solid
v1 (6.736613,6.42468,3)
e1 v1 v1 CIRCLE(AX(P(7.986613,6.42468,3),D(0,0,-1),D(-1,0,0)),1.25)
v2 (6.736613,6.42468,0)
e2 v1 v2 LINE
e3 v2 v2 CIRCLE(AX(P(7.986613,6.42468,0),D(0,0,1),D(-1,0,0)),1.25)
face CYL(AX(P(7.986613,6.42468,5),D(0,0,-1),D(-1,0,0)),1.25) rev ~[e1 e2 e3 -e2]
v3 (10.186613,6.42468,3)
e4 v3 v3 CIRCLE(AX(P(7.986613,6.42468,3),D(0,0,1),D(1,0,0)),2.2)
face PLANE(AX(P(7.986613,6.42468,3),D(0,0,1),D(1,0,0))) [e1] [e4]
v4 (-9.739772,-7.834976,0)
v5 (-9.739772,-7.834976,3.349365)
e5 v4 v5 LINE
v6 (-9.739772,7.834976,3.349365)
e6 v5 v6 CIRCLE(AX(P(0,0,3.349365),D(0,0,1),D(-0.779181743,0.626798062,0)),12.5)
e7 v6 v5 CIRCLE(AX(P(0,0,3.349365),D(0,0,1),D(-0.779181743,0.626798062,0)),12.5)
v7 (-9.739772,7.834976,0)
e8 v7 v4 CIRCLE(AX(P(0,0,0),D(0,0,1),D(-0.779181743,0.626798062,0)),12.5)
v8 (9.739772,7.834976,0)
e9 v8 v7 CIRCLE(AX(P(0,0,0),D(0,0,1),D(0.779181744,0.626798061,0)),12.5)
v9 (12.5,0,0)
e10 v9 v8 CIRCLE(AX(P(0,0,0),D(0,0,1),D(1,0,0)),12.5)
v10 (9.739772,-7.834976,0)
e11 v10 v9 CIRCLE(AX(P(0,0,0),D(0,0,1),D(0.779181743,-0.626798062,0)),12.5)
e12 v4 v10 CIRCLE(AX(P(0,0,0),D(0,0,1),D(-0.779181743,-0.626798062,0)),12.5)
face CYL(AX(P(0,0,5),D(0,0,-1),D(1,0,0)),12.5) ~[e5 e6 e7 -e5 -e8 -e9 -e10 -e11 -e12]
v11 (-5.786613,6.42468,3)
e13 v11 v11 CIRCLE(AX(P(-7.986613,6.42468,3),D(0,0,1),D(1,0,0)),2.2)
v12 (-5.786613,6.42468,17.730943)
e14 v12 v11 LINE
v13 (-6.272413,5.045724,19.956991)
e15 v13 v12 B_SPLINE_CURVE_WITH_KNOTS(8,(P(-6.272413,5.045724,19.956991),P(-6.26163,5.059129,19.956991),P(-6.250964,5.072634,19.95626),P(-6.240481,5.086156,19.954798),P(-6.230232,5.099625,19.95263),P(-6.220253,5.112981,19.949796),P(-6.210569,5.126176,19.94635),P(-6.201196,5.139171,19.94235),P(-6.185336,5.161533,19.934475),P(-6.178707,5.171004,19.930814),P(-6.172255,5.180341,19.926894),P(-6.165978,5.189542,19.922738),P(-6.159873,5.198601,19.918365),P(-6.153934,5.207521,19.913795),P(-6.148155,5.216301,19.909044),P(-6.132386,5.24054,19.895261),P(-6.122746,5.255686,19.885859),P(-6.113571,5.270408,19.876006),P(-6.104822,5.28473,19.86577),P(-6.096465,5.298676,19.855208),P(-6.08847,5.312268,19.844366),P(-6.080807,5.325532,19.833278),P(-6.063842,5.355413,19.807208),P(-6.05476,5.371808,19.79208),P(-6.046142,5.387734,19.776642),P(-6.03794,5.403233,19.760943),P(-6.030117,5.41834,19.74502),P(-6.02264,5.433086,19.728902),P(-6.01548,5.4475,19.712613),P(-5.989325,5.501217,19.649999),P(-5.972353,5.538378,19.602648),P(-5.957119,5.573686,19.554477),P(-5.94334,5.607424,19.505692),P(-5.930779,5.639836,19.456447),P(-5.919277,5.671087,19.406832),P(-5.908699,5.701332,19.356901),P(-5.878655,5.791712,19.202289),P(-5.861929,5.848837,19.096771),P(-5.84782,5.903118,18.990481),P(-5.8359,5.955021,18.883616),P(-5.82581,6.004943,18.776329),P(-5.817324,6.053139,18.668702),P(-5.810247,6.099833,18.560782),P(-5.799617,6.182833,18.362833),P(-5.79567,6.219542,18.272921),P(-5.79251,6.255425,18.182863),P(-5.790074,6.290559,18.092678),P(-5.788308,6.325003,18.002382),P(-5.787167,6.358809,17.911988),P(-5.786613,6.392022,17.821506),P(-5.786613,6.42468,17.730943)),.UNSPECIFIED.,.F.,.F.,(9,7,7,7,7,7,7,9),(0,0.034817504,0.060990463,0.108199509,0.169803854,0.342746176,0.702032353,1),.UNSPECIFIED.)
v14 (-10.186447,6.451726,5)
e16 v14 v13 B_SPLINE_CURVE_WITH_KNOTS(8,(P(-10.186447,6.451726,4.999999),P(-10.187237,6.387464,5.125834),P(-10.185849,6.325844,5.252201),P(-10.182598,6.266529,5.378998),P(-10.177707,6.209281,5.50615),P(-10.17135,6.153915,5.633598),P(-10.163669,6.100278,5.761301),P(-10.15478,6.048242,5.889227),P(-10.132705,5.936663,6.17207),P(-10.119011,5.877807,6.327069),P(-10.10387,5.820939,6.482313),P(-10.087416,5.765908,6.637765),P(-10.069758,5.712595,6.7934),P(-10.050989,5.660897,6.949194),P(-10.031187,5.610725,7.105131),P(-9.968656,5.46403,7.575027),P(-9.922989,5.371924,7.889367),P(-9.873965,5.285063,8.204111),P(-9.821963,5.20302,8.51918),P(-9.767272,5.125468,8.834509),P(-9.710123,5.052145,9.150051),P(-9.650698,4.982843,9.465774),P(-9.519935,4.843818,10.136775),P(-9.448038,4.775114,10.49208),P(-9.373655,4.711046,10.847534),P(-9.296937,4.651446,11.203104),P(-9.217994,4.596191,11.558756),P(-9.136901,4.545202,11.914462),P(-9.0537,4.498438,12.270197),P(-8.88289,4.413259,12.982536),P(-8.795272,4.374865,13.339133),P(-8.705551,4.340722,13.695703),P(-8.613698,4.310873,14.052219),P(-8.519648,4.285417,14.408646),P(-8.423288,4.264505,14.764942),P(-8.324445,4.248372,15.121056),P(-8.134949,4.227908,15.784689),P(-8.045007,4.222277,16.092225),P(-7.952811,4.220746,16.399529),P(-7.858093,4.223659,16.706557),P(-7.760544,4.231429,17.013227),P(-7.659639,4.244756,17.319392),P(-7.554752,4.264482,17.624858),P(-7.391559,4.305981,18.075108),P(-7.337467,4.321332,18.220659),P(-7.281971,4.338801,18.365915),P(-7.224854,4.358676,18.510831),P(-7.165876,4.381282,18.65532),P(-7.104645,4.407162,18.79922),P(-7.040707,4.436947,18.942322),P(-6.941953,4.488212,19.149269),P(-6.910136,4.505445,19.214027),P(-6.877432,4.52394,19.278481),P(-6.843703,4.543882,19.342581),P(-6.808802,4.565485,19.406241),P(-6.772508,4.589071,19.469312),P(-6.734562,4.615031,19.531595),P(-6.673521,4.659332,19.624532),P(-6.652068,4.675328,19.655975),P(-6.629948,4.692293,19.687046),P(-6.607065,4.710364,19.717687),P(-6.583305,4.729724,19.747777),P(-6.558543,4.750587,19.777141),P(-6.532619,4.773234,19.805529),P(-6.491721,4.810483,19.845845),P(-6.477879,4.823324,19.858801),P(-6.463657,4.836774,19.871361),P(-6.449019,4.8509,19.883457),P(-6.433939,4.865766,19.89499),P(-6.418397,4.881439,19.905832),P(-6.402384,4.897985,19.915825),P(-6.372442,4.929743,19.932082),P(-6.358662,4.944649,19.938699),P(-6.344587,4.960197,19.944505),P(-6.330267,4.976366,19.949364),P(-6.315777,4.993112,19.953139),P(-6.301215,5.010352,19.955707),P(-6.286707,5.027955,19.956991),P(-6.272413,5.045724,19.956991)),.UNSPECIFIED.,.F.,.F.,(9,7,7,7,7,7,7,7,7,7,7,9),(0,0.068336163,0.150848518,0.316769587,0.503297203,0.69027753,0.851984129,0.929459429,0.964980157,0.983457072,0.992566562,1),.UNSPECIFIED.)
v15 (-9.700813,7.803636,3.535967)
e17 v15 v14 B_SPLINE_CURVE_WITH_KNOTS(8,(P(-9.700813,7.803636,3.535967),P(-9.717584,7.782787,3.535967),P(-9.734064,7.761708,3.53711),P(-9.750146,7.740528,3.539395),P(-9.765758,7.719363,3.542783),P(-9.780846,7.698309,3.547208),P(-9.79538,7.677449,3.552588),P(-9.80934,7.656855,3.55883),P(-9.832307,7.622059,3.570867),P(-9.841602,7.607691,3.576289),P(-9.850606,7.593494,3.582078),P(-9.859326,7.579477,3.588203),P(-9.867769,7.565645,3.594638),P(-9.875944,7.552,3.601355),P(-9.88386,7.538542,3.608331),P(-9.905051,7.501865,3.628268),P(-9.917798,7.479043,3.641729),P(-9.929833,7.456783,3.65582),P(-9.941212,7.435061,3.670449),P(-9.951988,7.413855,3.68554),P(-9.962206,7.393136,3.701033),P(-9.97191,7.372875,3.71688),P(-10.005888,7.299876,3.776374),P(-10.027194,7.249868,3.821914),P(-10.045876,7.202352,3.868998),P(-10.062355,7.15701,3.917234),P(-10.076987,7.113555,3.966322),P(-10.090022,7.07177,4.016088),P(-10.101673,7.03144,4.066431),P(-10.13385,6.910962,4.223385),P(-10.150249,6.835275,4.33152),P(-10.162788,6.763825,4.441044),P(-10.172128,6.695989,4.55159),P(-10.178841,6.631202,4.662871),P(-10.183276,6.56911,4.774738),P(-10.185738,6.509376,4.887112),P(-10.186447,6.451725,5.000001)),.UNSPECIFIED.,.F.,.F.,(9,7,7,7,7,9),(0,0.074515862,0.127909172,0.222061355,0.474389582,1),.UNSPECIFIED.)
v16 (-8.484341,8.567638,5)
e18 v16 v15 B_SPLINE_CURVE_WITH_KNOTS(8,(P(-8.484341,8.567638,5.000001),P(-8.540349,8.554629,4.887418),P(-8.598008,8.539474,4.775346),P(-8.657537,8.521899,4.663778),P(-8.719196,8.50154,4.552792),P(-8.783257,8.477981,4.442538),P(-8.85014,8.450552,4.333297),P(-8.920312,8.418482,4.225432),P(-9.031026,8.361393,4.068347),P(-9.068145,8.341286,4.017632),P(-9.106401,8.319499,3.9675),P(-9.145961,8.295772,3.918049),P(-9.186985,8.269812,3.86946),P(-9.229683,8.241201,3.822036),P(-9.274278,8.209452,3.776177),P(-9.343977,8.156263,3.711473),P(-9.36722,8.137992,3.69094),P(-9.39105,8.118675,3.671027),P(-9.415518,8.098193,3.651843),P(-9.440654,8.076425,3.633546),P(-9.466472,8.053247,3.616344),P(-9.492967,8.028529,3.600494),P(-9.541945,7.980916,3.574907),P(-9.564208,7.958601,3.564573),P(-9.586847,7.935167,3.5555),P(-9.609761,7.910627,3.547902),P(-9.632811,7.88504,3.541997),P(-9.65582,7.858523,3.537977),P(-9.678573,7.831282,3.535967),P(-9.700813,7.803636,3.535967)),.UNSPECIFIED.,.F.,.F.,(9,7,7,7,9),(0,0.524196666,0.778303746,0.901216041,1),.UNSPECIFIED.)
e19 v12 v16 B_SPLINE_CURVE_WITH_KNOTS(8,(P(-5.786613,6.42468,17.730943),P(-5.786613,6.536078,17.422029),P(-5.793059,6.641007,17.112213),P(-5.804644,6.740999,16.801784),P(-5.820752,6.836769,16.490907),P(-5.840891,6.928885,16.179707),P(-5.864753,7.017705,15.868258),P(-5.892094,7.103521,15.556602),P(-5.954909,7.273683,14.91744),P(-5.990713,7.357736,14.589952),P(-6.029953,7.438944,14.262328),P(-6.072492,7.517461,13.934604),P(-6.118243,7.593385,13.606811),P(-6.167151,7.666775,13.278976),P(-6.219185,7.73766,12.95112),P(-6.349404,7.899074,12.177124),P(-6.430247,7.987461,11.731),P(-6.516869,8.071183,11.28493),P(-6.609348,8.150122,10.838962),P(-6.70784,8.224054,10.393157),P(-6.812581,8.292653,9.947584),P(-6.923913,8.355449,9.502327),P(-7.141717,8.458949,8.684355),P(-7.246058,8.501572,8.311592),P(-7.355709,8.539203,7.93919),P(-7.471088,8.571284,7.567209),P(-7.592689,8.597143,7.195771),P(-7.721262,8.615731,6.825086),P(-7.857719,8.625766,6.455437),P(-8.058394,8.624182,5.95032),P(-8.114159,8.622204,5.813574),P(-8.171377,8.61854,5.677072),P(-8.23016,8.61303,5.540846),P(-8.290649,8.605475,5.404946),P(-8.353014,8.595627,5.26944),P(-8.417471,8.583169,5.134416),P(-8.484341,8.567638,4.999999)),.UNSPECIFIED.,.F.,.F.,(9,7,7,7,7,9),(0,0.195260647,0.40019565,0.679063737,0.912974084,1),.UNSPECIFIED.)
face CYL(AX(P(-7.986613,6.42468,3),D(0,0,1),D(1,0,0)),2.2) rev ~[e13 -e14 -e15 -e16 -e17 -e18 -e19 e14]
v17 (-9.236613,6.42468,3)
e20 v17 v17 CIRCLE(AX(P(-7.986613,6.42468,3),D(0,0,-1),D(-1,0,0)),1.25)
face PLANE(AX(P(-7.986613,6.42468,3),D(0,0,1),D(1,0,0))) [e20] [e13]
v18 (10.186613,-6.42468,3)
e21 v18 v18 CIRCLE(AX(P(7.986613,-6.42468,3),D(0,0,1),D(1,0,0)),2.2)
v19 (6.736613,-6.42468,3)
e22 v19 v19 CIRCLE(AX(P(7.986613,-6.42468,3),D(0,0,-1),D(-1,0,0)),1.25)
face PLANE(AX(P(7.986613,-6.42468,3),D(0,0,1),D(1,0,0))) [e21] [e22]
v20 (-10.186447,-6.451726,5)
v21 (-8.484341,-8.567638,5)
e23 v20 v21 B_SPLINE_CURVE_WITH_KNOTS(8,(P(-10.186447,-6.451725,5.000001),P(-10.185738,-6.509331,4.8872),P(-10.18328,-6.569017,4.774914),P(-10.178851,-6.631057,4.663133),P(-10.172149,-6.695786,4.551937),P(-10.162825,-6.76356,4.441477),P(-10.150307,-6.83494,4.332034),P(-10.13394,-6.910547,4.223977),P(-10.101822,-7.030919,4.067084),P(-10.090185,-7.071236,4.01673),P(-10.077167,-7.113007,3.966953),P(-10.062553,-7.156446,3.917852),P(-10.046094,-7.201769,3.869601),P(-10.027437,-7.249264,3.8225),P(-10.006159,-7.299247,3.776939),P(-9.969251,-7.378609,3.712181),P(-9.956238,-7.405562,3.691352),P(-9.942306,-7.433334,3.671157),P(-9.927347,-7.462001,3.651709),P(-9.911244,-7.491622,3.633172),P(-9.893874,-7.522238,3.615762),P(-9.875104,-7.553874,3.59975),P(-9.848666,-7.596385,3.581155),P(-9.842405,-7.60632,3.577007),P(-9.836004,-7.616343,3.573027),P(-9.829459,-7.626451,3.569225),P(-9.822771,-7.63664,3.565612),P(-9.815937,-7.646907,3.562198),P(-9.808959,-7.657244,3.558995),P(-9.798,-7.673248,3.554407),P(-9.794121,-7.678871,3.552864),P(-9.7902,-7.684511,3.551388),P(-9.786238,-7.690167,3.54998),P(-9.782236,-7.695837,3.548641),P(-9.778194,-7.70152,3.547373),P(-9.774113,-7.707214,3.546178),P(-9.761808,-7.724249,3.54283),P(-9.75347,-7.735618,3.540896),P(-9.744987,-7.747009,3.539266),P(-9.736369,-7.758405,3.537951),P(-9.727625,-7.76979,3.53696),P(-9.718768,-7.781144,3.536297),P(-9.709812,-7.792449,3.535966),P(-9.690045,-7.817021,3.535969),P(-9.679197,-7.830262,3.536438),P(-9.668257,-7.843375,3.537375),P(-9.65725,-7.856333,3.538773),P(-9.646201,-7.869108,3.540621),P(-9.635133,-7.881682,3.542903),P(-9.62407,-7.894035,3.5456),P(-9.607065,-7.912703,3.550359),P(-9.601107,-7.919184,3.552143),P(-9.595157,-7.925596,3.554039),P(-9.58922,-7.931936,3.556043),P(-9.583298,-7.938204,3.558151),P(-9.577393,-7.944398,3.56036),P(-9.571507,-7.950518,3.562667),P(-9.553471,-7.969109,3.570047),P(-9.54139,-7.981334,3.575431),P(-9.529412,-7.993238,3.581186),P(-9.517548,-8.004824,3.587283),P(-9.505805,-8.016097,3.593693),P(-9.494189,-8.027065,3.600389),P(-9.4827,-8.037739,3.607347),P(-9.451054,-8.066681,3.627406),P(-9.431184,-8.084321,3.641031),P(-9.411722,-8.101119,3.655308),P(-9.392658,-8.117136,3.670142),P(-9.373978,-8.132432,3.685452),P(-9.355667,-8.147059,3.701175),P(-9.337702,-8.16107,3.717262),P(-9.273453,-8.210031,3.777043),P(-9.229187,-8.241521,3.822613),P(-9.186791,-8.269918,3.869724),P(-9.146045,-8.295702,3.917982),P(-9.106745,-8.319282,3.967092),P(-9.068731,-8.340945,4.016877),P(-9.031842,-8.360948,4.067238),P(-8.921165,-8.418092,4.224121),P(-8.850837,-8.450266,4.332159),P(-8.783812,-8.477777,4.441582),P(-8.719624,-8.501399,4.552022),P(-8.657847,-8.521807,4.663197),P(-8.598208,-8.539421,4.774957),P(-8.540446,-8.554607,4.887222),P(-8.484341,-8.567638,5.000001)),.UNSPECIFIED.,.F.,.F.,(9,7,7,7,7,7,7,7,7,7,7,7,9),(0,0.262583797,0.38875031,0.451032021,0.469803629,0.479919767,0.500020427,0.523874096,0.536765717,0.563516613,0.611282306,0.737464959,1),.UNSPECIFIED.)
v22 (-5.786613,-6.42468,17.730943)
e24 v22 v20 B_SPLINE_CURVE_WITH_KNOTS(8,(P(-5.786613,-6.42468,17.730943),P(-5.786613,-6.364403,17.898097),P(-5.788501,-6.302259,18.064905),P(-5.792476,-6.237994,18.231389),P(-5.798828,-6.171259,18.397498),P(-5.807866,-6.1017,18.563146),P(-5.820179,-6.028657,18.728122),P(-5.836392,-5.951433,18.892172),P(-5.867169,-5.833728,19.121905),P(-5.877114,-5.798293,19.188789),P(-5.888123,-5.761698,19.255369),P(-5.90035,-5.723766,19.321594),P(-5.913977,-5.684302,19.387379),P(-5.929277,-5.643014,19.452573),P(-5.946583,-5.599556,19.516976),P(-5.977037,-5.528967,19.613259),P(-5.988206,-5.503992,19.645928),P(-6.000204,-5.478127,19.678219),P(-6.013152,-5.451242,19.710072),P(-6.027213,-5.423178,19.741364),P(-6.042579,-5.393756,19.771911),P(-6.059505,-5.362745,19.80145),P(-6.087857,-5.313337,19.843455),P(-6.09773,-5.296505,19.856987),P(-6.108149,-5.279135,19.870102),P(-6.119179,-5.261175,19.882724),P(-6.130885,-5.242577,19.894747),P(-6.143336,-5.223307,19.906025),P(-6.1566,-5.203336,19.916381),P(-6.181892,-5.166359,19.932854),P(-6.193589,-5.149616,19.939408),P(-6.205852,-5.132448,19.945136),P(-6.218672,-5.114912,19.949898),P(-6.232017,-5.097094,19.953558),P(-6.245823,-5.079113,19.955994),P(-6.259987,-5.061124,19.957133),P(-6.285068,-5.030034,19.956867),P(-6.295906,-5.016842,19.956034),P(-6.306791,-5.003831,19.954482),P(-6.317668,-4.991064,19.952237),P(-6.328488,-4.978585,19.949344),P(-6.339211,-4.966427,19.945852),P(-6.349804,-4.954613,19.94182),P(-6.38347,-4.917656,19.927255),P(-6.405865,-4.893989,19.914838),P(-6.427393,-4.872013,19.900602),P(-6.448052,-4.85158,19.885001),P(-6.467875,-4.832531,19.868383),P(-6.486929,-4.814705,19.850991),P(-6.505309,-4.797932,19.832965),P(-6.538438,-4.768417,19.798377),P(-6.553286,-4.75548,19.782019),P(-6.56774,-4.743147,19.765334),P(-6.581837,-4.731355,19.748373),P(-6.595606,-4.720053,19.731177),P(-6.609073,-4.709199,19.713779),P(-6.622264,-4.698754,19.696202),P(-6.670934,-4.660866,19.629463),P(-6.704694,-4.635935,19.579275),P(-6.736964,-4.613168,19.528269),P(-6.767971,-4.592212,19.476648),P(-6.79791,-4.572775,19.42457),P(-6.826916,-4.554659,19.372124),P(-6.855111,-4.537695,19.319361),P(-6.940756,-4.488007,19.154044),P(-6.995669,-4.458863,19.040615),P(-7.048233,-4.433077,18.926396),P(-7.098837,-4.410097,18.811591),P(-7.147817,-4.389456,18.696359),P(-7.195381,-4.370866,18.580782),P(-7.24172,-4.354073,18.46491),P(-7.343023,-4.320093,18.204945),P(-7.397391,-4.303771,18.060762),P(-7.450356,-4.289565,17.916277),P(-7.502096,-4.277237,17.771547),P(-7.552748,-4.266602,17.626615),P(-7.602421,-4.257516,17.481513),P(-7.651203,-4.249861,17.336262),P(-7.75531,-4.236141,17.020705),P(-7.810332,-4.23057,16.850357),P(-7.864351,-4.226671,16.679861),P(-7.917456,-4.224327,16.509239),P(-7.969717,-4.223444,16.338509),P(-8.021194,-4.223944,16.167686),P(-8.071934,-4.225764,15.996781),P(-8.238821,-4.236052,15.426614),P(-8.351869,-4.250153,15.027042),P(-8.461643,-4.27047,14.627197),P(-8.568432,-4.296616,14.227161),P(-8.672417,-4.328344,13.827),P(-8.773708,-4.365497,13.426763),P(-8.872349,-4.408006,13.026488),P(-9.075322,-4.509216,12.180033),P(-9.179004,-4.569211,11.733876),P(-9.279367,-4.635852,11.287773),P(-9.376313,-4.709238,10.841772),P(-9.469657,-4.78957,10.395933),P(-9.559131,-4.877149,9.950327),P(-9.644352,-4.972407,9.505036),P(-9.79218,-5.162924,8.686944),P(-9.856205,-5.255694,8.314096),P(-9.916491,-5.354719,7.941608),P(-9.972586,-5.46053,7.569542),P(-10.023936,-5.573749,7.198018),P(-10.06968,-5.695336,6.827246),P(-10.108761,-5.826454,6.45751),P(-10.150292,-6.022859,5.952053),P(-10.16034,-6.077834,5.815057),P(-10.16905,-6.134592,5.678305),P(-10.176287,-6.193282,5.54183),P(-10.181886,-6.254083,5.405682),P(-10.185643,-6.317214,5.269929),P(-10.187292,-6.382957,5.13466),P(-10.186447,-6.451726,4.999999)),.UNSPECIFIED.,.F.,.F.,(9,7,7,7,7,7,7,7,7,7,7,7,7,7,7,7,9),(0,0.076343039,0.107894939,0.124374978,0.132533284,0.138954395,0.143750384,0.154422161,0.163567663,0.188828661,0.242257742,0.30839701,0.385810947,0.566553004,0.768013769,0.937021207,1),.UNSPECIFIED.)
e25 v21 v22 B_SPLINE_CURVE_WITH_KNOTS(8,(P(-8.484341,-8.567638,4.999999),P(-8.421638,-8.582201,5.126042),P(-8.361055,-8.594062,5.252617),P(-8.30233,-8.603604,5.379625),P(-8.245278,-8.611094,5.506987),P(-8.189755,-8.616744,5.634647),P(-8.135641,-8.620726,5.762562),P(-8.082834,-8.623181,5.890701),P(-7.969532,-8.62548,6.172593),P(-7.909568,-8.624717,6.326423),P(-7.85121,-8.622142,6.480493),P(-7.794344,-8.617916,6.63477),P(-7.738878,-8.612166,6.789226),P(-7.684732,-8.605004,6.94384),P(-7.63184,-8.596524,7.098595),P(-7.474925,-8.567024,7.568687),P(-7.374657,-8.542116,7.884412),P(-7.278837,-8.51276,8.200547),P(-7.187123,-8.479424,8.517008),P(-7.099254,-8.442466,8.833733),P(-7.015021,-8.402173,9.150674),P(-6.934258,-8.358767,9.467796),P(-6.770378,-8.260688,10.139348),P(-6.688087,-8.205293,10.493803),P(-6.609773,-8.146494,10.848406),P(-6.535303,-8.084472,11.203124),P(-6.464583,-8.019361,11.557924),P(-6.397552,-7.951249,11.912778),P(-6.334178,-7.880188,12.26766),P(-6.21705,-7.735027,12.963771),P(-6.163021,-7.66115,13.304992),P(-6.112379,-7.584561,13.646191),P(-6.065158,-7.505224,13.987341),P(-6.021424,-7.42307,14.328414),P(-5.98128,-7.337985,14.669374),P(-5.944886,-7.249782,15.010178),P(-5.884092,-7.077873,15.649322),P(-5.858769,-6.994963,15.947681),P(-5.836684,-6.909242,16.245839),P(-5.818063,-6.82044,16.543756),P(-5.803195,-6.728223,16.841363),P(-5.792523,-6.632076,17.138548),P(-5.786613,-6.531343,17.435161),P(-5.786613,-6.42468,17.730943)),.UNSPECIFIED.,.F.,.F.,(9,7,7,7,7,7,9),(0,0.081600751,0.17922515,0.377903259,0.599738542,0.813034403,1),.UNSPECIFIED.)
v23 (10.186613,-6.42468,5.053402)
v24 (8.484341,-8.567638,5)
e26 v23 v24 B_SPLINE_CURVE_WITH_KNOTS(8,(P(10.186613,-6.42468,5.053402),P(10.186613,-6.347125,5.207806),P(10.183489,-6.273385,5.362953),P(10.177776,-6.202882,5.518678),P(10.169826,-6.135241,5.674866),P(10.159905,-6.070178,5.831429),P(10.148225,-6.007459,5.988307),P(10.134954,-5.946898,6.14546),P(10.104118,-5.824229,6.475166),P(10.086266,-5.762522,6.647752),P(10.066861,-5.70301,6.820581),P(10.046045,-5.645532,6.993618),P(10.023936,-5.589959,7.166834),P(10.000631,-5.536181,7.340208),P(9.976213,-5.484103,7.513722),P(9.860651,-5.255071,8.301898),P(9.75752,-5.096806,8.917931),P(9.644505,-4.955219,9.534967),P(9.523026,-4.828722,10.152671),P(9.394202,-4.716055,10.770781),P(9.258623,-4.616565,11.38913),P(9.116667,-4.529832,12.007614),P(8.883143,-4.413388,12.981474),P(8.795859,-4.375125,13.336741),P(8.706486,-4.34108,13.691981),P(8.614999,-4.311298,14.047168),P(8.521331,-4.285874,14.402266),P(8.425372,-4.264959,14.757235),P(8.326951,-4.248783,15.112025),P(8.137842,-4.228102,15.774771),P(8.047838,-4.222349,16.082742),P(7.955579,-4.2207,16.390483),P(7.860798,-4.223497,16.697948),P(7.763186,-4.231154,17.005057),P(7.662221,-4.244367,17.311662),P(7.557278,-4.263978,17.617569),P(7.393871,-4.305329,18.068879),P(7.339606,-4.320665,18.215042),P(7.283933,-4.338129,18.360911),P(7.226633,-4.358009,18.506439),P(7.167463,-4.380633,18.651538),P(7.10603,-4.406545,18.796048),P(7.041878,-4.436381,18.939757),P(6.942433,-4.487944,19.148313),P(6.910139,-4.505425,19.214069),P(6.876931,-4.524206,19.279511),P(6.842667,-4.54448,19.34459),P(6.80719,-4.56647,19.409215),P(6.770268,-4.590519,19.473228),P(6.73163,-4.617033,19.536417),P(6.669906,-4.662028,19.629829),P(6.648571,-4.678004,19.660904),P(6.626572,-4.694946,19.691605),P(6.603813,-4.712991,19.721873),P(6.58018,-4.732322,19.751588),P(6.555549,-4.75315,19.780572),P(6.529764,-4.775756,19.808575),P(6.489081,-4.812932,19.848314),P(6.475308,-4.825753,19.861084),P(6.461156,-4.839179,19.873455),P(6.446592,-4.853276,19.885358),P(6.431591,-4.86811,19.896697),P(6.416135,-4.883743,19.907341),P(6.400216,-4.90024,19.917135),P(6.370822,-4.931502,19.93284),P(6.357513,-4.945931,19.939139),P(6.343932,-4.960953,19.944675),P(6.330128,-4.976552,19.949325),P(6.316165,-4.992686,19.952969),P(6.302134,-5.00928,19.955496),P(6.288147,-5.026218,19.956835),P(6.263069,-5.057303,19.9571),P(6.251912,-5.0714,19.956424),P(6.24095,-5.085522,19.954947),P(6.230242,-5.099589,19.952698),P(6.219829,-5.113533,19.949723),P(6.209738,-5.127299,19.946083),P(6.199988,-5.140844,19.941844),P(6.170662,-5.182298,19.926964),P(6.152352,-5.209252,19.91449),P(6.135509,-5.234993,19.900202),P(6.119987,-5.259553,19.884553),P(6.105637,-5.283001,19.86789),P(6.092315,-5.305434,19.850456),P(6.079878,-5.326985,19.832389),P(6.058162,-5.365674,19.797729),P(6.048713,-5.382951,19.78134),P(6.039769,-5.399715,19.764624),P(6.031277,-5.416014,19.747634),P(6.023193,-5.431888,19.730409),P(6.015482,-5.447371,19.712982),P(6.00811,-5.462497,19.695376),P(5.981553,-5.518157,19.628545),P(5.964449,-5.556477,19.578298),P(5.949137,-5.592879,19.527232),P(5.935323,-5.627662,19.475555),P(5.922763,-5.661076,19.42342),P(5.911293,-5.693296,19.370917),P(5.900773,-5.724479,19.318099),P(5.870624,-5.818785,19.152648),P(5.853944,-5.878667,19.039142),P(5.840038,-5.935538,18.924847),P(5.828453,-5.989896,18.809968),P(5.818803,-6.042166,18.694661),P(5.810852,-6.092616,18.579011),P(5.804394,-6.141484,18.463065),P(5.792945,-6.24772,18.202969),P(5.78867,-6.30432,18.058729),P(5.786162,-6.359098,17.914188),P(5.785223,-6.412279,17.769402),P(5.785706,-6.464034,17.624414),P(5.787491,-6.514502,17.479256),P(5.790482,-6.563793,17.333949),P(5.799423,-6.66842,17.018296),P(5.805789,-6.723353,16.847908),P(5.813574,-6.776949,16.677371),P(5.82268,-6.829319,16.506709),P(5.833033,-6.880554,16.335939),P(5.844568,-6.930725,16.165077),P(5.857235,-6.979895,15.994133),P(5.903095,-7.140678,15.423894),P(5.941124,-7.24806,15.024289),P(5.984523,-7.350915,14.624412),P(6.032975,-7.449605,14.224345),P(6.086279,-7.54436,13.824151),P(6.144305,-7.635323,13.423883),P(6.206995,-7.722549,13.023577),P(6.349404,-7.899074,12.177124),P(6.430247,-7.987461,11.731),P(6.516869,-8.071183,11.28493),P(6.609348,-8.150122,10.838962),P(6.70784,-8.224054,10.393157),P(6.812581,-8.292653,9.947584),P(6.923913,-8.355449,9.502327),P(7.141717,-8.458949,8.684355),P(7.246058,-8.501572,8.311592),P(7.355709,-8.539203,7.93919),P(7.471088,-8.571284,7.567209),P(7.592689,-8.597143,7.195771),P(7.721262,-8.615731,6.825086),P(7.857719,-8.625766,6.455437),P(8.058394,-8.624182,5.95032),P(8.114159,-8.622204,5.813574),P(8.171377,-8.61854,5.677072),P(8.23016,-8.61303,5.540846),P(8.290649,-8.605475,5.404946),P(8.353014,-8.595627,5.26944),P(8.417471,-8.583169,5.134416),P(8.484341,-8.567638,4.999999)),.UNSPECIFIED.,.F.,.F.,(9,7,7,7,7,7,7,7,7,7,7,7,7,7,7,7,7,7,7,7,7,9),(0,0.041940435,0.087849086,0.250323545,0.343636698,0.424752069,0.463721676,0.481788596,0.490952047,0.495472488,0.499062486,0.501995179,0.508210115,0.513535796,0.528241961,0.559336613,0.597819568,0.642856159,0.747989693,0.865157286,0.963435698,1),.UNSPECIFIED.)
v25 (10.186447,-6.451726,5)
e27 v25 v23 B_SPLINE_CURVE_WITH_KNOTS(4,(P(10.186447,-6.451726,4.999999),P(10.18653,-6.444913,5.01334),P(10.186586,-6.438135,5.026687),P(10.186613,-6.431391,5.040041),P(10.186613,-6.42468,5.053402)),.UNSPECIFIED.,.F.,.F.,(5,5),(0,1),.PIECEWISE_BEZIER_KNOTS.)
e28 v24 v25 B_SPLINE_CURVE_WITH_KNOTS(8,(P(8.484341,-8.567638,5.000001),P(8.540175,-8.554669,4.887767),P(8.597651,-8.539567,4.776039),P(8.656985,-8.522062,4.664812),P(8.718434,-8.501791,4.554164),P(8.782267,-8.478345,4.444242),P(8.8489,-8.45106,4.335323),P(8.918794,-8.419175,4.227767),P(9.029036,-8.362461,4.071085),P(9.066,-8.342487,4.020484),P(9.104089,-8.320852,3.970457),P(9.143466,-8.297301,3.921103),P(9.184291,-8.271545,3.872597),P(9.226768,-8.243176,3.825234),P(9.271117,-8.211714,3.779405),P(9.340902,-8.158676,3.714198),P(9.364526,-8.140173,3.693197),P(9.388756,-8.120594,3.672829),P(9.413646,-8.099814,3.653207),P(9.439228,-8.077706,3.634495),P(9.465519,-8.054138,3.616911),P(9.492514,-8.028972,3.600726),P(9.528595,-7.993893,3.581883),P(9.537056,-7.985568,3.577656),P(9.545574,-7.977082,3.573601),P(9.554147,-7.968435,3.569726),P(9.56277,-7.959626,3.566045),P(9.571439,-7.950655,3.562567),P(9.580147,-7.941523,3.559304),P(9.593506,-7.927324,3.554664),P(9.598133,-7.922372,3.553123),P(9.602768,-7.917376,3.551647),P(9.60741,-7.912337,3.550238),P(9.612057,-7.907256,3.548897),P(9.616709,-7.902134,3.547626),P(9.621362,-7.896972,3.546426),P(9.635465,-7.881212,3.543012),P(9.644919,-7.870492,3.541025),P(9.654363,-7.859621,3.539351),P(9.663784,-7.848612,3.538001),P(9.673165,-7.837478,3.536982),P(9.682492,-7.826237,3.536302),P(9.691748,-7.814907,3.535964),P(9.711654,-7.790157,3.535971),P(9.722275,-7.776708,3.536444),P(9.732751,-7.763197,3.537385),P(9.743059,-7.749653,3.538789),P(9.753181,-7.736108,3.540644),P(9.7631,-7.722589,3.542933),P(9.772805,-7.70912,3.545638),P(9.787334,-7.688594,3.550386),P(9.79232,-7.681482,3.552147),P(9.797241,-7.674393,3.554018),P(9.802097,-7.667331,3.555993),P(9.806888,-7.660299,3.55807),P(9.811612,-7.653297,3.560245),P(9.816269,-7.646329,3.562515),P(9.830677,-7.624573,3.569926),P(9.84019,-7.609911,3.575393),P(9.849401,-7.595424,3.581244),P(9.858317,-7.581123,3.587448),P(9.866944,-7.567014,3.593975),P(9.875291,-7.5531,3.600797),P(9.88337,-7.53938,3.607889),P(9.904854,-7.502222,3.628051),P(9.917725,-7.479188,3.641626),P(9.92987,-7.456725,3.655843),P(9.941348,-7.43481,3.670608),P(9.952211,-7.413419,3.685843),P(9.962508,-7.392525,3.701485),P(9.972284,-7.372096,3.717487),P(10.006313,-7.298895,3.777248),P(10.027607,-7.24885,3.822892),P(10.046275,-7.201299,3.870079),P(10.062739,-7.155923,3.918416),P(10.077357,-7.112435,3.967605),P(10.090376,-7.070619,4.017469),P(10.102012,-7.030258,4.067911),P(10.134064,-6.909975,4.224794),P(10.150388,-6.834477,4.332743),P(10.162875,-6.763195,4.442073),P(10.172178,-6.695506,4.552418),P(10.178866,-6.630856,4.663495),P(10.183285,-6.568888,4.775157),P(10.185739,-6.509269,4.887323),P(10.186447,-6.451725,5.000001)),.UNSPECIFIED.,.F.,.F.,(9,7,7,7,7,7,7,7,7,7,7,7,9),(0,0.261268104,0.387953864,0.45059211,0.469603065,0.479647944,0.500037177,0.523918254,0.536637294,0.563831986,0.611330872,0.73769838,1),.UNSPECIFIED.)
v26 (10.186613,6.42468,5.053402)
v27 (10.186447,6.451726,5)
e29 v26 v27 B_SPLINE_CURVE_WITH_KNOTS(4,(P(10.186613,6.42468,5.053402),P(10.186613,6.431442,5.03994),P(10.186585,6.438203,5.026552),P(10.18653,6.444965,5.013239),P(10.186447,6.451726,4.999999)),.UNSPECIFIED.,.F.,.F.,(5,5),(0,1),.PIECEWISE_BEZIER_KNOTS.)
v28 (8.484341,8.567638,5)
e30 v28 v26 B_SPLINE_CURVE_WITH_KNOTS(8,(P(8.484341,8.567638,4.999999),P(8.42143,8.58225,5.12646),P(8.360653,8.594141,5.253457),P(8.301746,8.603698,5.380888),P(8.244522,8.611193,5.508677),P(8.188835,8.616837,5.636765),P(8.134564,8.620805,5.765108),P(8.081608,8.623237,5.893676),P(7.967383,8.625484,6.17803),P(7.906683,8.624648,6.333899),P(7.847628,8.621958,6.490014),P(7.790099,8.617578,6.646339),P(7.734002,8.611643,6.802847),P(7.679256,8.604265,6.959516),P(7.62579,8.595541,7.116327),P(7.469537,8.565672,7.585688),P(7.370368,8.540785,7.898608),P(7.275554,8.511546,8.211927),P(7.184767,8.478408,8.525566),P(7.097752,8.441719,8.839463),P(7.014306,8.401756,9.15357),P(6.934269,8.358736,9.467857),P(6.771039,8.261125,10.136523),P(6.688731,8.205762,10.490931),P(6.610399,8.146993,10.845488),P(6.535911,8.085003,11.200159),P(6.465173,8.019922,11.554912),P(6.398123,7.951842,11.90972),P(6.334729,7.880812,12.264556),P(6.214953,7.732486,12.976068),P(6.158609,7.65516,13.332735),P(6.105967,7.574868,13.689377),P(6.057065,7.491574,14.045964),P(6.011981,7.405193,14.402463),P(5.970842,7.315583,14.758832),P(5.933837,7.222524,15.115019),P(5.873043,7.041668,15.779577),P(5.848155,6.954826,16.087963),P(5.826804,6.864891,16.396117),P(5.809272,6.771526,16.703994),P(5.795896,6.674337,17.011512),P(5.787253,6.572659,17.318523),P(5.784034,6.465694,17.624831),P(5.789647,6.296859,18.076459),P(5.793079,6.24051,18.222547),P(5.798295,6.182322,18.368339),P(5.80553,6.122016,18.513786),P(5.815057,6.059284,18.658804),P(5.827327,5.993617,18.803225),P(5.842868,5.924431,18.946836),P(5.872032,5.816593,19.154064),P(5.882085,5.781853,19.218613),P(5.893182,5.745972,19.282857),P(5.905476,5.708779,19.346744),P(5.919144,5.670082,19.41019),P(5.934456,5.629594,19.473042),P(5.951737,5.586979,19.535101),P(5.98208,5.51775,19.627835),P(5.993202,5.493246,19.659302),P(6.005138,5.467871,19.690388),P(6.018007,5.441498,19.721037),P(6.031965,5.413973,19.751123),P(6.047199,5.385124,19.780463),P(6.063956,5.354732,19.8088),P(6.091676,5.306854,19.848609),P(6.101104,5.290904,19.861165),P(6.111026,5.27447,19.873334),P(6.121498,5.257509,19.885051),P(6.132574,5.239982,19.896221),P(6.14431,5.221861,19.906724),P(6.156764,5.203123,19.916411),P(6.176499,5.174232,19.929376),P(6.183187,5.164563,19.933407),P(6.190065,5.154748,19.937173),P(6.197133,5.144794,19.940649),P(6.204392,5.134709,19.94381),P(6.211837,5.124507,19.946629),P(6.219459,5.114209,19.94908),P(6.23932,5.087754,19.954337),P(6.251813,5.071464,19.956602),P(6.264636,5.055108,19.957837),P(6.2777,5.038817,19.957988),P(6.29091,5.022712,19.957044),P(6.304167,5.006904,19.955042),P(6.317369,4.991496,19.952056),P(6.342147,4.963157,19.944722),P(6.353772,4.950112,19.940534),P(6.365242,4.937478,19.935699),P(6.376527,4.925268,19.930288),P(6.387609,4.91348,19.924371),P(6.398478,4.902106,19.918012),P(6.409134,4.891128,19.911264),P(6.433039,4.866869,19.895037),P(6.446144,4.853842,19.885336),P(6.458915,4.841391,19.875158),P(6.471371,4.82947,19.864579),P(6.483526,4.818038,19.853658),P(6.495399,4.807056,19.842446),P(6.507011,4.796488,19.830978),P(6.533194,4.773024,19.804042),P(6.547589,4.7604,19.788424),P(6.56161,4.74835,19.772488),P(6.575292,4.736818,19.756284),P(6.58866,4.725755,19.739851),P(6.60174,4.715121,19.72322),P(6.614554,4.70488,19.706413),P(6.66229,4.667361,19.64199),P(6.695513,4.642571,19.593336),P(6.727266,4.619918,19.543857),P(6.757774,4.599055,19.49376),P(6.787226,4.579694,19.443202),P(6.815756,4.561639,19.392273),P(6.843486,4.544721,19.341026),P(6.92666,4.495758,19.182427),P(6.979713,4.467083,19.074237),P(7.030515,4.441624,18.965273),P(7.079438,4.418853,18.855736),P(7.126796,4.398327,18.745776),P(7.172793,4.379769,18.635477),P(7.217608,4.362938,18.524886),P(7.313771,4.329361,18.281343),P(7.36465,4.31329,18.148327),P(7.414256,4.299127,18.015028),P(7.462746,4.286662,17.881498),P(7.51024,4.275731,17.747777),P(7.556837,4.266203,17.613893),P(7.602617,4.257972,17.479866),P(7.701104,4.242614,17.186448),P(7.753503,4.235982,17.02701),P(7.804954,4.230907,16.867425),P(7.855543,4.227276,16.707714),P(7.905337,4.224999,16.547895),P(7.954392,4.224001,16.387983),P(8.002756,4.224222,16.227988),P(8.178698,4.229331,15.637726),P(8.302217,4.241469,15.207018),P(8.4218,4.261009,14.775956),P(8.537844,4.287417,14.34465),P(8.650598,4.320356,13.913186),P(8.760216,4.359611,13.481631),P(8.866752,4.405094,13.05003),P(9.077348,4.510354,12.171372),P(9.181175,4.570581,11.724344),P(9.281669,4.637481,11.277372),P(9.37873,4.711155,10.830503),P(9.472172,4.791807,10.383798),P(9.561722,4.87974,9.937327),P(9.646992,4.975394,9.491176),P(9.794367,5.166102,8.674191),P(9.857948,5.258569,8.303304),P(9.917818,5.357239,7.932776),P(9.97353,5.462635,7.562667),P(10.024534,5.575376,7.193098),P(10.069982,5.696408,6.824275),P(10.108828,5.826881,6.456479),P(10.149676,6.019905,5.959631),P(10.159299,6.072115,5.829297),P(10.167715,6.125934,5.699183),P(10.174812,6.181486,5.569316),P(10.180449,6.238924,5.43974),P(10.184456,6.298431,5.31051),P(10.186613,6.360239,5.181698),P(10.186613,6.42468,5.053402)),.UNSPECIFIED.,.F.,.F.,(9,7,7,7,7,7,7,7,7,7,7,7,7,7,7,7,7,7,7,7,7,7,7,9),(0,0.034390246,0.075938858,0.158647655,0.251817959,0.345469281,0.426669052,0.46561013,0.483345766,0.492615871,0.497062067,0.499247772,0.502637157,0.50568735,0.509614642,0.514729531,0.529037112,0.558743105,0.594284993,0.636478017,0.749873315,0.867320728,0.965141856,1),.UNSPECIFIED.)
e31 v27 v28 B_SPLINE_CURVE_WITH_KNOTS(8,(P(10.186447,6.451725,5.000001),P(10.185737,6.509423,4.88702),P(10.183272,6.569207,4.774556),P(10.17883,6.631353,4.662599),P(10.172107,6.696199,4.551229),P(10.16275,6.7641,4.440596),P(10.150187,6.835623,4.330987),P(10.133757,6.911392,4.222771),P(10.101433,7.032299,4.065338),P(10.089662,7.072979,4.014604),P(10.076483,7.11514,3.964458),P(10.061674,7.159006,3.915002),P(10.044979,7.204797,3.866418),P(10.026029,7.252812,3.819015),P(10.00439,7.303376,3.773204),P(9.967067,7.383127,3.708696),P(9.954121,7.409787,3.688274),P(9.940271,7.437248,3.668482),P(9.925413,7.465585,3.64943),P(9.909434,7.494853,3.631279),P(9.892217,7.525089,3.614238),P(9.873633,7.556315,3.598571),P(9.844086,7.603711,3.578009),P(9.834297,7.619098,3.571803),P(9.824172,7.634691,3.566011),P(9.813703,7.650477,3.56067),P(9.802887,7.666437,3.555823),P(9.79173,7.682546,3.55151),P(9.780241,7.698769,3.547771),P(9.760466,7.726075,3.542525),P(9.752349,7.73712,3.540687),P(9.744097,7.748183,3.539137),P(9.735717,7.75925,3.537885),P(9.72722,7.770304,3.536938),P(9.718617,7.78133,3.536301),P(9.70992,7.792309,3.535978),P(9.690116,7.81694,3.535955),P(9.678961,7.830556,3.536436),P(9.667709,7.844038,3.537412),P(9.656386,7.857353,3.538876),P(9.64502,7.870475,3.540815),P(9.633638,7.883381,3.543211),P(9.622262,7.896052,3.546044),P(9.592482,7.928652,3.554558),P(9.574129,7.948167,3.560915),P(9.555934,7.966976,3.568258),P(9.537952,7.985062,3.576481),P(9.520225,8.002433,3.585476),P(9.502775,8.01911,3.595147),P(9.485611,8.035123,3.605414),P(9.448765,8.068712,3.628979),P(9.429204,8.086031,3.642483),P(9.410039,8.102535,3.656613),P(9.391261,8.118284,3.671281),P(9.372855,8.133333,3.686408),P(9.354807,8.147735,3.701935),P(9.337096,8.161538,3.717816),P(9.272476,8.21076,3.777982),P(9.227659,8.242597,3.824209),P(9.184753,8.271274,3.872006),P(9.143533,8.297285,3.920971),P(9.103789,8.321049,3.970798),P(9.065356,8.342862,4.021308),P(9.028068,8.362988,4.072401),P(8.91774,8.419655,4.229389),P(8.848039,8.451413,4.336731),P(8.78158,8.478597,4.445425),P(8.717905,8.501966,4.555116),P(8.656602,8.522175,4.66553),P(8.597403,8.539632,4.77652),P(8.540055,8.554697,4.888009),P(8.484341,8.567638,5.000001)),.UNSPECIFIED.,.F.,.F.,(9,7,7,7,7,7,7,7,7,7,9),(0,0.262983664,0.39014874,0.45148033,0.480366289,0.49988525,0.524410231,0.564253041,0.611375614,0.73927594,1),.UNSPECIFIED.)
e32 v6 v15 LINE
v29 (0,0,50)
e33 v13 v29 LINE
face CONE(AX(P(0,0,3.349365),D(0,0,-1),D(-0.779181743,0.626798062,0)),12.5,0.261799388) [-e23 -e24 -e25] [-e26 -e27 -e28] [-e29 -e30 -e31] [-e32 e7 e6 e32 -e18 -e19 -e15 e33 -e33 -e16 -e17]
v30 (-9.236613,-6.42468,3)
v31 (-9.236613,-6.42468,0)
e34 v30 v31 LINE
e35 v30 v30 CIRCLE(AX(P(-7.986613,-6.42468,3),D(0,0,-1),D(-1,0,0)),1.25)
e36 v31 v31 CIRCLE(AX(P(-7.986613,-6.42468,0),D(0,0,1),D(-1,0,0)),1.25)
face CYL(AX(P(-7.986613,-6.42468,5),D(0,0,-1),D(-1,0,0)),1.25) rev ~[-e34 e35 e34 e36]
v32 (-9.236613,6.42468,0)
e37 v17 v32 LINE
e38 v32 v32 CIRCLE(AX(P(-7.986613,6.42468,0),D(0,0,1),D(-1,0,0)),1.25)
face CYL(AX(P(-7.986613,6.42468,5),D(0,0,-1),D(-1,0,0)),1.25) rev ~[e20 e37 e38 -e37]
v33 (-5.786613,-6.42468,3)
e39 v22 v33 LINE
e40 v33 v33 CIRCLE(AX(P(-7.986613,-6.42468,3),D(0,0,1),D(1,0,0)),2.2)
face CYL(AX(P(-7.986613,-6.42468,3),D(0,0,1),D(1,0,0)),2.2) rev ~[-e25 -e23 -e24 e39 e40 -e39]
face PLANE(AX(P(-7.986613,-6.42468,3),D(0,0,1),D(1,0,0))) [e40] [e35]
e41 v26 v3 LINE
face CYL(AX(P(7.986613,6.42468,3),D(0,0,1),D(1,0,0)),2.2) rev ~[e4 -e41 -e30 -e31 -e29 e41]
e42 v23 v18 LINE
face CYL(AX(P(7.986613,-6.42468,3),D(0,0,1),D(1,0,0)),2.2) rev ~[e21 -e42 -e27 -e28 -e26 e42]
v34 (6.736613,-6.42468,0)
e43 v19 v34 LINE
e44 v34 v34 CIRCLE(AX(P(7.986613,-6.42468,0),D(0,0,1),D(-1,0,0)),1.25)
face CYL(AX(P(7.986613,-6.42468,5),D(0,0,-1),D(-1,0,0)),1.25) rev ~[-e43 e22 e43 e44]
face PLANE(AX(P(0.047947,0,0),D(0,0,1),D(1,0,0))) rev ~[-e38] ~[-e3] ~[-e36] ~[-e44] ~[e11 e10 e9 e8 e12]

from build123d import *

# Parameters (mm, degrees)
F0_R           = 1.25
F1_DEPTH       = 5
F3_D           = 2.5
F3_DEPTH       = 5
F3_CBORE_D     = 4.4
F3_CBORE_DEPTH = 2
F3_TIP         = 0.7510757738
F4_DEPTH       = 45


# Not quite as in the source:
# - a fillet or chamfer that OpenCascade refuses, or shapes differently, is made with other operations: its cross-section is extruded or revolved along the edge and cut away or added


with BuildPart() as f1:
    # F0 (on Top) → F1 (new body)
    with BuildSketch(Plane.XY):
        with BuildLine():
            ThreePointArc((9.7397717911, -7.8349757789), (11.7897656336, -4.1534836349), (12.5, 0))
            ThreePointArc((12.5, 0), (11.7897656358, 4.1534836287), (9.7397717994, 7.8349757687))
            ThreePointArc((9.7397717994, 7.8349757687), (6.6e-09, 12.5), (-9.7397717911, 7.8349757789))
            ThreePointArc((-9.7397717911, 7.8349757789), (-12.5, 0), (-9.7397717911, -7.8349757789))
            ThreePointArc((-9.7397717911, -7.8349757789), (0, -12.5), (9.7397717911, -7.8349757789))
        make_face()
        with BuildLine():
            ThreePointArc((-5.7366128015, -6.4246802223), (-7.2389857978, -8.5468380541), (-9.7397717911, -7.8349757789))
            ThreePointArc((-9.7397717911, -7.8349757789), (-8.7342398052, -4.3025223904), (-5.7366128015, -6.4246802223))
        make_face(mode=Mode.SUBTRACT)
        with BuildLine():
            ThreePointArc((10.2366128015, -6.4246802223), (10.1087706334, -7.172307226), (9.7397717911, -7.8349757789))
            ThreePointArc((9.7397717911, -7.8349757789), (5.8644549697, -5.6770532186), (10.2366128015, -6.4246802223))
        make_face(mode=Mode.SUBTRACT)
        with BuildLine():
            ThreePointArc((-5.7366128015, 6.4246802223), (-8.7342398052, 4.3025223904), (-9.7397717911, 7.8349757789))
            ThreePointArc((-9.7397717911, 7.8349757789), (-7.2389857978, 8.5468380541), (-5.7366128015, 6.4246802223))
        make_face(mode=Mode.SUBTRACT)
        with BuildLine():
            ThreePointArc((10.2366128015, 6.4246802223), (5.8644549675, 5.6770532248), (9.7397717994, 7.8349757687))
            ThreePointArc((9.7397717994, 7.8349757687), (10.1087706356, 7.1723072198), (10.2366128015, 6.4246802223))
        make_face(mode=Mode.SUBTRACT)
        with BuildLine():
            ThreePointArc((10.2366128015, 6.4246802223), (10.1087706356, 7.1723072198), (9.7397717994, 7.8349757687))
            ThreePointArc((9.7397717994, 7.8349757687), (5.8644549675, 5.6770532248), (10.2366128015, 6.4246802223))
        make_face()
        with Locations((7.9866128015, 6.4246802223)):
            Circle(F0_R, mode=Mode.SUBTRACT)
        with BuildLine():
            ThreePointArc((10.2366128015, -6.4246802223), (5.8644549697, -5.6770532186), (9.7397717911, -7.8349757789))
            ThreePointArc((9.7397717911, -7.8349757789), (10.1087706334, -7.172307226), (10.2366128015, -6.4246802223))
        make_face()
        with Locations((7.9866128015, -6.4246802223)):
            Circle(F0_R, mode=Mode.SUBTRACT)
        with BuildLine():
            ThreePointArc((-5.7366128015, -6.4246802223), (-8.7342398052, -4.3025223904), (-9.7397717911, -7.8349757789))
            ThreePointArc((-9.7397717911, -7.8349757789), (-7.2389857978, -8.5468380541), (-5.7366128015, -6.4246802223))
        make_face()
        with Locations((-7.9866128015, -6.4246802223)):
            Circle(F0_R, mode=Mode.SUBTRACT)
        with BuildLine():
            ThreePointArc((-5.7366128015, 6.4246802223), (-7.2389857978, 8.5468380541), (-9.7397717911, 7.8349757789))
            ThreePointArc((-9.7397717911, 7.8349757789), (-8.7342398052, 4.3025223904), (-5.7366128015, 6.4246802223))
        make_face()
        with Locations((-7.9866128015, 6.4246802223)):
            Circle(F0_R, mode=Mode.SUBTRACT)
        with Locations((7.9866128015, 6.4246802223)):
            Circle(F0_R)
        with Locations((7.9866128015, -6.4246802223)):
            Circle(F0_R)
        with Locations((-7.9866128015, -6.4246802223)):
            Circle(F0_R)
        with Locations((-7.9866128015, 6.4246802223)):
            Circle(F0_R)
    extrude(amount=F1_DEPTH)

    # F3
    with Locations(Plane.XY.offset(5)):
        with Locations((-7.9866128015, 6.4246802223), (-7.9866128015, -6.4246802223), (7.9866128015, -6.4246802223), (7.9866128015, 6.4246802223)):
            CounterBoreHole(F3_D / 2, F3_CBORE_D / 2, F3_CBORE_DEPTH, depth=F3_DEPTH)
            with Locations((0, 0, -(F3_DEPTH + F3_TIP / 2))):  # 118° drill point
                Cone(0, F3_D / 2, F3_TIP, mode=Mode.SUBTRACT)

    # F4 (add): a face of the model
    f4_faces = [f1.faces().sort_by_distance(p)[0] for p in [
        (0, 0, 5),
    ]]
    extrude(f4_faces, amount=F4_DEPTH)

    # F5: chamfer of 12.5 x 46.6506350946 on 1 edges, made by hand

    # F5_s1 → F5_t2 (revolve, cut)
    with BuildSketch(Plane(origin=(0, 0, 0), x_dir=(0, 0, 1), z_dir=(0.6267980623, 0.7791817433, 0))):
        Polygon((3.3493649054, -12.5), (50, 0), (50, -12.5), align=None)
    revolve(axis=Axis((0, 0, 50), (0, 0, 1)), mode=Mode.SUBTRACT)


solid = f1.part
